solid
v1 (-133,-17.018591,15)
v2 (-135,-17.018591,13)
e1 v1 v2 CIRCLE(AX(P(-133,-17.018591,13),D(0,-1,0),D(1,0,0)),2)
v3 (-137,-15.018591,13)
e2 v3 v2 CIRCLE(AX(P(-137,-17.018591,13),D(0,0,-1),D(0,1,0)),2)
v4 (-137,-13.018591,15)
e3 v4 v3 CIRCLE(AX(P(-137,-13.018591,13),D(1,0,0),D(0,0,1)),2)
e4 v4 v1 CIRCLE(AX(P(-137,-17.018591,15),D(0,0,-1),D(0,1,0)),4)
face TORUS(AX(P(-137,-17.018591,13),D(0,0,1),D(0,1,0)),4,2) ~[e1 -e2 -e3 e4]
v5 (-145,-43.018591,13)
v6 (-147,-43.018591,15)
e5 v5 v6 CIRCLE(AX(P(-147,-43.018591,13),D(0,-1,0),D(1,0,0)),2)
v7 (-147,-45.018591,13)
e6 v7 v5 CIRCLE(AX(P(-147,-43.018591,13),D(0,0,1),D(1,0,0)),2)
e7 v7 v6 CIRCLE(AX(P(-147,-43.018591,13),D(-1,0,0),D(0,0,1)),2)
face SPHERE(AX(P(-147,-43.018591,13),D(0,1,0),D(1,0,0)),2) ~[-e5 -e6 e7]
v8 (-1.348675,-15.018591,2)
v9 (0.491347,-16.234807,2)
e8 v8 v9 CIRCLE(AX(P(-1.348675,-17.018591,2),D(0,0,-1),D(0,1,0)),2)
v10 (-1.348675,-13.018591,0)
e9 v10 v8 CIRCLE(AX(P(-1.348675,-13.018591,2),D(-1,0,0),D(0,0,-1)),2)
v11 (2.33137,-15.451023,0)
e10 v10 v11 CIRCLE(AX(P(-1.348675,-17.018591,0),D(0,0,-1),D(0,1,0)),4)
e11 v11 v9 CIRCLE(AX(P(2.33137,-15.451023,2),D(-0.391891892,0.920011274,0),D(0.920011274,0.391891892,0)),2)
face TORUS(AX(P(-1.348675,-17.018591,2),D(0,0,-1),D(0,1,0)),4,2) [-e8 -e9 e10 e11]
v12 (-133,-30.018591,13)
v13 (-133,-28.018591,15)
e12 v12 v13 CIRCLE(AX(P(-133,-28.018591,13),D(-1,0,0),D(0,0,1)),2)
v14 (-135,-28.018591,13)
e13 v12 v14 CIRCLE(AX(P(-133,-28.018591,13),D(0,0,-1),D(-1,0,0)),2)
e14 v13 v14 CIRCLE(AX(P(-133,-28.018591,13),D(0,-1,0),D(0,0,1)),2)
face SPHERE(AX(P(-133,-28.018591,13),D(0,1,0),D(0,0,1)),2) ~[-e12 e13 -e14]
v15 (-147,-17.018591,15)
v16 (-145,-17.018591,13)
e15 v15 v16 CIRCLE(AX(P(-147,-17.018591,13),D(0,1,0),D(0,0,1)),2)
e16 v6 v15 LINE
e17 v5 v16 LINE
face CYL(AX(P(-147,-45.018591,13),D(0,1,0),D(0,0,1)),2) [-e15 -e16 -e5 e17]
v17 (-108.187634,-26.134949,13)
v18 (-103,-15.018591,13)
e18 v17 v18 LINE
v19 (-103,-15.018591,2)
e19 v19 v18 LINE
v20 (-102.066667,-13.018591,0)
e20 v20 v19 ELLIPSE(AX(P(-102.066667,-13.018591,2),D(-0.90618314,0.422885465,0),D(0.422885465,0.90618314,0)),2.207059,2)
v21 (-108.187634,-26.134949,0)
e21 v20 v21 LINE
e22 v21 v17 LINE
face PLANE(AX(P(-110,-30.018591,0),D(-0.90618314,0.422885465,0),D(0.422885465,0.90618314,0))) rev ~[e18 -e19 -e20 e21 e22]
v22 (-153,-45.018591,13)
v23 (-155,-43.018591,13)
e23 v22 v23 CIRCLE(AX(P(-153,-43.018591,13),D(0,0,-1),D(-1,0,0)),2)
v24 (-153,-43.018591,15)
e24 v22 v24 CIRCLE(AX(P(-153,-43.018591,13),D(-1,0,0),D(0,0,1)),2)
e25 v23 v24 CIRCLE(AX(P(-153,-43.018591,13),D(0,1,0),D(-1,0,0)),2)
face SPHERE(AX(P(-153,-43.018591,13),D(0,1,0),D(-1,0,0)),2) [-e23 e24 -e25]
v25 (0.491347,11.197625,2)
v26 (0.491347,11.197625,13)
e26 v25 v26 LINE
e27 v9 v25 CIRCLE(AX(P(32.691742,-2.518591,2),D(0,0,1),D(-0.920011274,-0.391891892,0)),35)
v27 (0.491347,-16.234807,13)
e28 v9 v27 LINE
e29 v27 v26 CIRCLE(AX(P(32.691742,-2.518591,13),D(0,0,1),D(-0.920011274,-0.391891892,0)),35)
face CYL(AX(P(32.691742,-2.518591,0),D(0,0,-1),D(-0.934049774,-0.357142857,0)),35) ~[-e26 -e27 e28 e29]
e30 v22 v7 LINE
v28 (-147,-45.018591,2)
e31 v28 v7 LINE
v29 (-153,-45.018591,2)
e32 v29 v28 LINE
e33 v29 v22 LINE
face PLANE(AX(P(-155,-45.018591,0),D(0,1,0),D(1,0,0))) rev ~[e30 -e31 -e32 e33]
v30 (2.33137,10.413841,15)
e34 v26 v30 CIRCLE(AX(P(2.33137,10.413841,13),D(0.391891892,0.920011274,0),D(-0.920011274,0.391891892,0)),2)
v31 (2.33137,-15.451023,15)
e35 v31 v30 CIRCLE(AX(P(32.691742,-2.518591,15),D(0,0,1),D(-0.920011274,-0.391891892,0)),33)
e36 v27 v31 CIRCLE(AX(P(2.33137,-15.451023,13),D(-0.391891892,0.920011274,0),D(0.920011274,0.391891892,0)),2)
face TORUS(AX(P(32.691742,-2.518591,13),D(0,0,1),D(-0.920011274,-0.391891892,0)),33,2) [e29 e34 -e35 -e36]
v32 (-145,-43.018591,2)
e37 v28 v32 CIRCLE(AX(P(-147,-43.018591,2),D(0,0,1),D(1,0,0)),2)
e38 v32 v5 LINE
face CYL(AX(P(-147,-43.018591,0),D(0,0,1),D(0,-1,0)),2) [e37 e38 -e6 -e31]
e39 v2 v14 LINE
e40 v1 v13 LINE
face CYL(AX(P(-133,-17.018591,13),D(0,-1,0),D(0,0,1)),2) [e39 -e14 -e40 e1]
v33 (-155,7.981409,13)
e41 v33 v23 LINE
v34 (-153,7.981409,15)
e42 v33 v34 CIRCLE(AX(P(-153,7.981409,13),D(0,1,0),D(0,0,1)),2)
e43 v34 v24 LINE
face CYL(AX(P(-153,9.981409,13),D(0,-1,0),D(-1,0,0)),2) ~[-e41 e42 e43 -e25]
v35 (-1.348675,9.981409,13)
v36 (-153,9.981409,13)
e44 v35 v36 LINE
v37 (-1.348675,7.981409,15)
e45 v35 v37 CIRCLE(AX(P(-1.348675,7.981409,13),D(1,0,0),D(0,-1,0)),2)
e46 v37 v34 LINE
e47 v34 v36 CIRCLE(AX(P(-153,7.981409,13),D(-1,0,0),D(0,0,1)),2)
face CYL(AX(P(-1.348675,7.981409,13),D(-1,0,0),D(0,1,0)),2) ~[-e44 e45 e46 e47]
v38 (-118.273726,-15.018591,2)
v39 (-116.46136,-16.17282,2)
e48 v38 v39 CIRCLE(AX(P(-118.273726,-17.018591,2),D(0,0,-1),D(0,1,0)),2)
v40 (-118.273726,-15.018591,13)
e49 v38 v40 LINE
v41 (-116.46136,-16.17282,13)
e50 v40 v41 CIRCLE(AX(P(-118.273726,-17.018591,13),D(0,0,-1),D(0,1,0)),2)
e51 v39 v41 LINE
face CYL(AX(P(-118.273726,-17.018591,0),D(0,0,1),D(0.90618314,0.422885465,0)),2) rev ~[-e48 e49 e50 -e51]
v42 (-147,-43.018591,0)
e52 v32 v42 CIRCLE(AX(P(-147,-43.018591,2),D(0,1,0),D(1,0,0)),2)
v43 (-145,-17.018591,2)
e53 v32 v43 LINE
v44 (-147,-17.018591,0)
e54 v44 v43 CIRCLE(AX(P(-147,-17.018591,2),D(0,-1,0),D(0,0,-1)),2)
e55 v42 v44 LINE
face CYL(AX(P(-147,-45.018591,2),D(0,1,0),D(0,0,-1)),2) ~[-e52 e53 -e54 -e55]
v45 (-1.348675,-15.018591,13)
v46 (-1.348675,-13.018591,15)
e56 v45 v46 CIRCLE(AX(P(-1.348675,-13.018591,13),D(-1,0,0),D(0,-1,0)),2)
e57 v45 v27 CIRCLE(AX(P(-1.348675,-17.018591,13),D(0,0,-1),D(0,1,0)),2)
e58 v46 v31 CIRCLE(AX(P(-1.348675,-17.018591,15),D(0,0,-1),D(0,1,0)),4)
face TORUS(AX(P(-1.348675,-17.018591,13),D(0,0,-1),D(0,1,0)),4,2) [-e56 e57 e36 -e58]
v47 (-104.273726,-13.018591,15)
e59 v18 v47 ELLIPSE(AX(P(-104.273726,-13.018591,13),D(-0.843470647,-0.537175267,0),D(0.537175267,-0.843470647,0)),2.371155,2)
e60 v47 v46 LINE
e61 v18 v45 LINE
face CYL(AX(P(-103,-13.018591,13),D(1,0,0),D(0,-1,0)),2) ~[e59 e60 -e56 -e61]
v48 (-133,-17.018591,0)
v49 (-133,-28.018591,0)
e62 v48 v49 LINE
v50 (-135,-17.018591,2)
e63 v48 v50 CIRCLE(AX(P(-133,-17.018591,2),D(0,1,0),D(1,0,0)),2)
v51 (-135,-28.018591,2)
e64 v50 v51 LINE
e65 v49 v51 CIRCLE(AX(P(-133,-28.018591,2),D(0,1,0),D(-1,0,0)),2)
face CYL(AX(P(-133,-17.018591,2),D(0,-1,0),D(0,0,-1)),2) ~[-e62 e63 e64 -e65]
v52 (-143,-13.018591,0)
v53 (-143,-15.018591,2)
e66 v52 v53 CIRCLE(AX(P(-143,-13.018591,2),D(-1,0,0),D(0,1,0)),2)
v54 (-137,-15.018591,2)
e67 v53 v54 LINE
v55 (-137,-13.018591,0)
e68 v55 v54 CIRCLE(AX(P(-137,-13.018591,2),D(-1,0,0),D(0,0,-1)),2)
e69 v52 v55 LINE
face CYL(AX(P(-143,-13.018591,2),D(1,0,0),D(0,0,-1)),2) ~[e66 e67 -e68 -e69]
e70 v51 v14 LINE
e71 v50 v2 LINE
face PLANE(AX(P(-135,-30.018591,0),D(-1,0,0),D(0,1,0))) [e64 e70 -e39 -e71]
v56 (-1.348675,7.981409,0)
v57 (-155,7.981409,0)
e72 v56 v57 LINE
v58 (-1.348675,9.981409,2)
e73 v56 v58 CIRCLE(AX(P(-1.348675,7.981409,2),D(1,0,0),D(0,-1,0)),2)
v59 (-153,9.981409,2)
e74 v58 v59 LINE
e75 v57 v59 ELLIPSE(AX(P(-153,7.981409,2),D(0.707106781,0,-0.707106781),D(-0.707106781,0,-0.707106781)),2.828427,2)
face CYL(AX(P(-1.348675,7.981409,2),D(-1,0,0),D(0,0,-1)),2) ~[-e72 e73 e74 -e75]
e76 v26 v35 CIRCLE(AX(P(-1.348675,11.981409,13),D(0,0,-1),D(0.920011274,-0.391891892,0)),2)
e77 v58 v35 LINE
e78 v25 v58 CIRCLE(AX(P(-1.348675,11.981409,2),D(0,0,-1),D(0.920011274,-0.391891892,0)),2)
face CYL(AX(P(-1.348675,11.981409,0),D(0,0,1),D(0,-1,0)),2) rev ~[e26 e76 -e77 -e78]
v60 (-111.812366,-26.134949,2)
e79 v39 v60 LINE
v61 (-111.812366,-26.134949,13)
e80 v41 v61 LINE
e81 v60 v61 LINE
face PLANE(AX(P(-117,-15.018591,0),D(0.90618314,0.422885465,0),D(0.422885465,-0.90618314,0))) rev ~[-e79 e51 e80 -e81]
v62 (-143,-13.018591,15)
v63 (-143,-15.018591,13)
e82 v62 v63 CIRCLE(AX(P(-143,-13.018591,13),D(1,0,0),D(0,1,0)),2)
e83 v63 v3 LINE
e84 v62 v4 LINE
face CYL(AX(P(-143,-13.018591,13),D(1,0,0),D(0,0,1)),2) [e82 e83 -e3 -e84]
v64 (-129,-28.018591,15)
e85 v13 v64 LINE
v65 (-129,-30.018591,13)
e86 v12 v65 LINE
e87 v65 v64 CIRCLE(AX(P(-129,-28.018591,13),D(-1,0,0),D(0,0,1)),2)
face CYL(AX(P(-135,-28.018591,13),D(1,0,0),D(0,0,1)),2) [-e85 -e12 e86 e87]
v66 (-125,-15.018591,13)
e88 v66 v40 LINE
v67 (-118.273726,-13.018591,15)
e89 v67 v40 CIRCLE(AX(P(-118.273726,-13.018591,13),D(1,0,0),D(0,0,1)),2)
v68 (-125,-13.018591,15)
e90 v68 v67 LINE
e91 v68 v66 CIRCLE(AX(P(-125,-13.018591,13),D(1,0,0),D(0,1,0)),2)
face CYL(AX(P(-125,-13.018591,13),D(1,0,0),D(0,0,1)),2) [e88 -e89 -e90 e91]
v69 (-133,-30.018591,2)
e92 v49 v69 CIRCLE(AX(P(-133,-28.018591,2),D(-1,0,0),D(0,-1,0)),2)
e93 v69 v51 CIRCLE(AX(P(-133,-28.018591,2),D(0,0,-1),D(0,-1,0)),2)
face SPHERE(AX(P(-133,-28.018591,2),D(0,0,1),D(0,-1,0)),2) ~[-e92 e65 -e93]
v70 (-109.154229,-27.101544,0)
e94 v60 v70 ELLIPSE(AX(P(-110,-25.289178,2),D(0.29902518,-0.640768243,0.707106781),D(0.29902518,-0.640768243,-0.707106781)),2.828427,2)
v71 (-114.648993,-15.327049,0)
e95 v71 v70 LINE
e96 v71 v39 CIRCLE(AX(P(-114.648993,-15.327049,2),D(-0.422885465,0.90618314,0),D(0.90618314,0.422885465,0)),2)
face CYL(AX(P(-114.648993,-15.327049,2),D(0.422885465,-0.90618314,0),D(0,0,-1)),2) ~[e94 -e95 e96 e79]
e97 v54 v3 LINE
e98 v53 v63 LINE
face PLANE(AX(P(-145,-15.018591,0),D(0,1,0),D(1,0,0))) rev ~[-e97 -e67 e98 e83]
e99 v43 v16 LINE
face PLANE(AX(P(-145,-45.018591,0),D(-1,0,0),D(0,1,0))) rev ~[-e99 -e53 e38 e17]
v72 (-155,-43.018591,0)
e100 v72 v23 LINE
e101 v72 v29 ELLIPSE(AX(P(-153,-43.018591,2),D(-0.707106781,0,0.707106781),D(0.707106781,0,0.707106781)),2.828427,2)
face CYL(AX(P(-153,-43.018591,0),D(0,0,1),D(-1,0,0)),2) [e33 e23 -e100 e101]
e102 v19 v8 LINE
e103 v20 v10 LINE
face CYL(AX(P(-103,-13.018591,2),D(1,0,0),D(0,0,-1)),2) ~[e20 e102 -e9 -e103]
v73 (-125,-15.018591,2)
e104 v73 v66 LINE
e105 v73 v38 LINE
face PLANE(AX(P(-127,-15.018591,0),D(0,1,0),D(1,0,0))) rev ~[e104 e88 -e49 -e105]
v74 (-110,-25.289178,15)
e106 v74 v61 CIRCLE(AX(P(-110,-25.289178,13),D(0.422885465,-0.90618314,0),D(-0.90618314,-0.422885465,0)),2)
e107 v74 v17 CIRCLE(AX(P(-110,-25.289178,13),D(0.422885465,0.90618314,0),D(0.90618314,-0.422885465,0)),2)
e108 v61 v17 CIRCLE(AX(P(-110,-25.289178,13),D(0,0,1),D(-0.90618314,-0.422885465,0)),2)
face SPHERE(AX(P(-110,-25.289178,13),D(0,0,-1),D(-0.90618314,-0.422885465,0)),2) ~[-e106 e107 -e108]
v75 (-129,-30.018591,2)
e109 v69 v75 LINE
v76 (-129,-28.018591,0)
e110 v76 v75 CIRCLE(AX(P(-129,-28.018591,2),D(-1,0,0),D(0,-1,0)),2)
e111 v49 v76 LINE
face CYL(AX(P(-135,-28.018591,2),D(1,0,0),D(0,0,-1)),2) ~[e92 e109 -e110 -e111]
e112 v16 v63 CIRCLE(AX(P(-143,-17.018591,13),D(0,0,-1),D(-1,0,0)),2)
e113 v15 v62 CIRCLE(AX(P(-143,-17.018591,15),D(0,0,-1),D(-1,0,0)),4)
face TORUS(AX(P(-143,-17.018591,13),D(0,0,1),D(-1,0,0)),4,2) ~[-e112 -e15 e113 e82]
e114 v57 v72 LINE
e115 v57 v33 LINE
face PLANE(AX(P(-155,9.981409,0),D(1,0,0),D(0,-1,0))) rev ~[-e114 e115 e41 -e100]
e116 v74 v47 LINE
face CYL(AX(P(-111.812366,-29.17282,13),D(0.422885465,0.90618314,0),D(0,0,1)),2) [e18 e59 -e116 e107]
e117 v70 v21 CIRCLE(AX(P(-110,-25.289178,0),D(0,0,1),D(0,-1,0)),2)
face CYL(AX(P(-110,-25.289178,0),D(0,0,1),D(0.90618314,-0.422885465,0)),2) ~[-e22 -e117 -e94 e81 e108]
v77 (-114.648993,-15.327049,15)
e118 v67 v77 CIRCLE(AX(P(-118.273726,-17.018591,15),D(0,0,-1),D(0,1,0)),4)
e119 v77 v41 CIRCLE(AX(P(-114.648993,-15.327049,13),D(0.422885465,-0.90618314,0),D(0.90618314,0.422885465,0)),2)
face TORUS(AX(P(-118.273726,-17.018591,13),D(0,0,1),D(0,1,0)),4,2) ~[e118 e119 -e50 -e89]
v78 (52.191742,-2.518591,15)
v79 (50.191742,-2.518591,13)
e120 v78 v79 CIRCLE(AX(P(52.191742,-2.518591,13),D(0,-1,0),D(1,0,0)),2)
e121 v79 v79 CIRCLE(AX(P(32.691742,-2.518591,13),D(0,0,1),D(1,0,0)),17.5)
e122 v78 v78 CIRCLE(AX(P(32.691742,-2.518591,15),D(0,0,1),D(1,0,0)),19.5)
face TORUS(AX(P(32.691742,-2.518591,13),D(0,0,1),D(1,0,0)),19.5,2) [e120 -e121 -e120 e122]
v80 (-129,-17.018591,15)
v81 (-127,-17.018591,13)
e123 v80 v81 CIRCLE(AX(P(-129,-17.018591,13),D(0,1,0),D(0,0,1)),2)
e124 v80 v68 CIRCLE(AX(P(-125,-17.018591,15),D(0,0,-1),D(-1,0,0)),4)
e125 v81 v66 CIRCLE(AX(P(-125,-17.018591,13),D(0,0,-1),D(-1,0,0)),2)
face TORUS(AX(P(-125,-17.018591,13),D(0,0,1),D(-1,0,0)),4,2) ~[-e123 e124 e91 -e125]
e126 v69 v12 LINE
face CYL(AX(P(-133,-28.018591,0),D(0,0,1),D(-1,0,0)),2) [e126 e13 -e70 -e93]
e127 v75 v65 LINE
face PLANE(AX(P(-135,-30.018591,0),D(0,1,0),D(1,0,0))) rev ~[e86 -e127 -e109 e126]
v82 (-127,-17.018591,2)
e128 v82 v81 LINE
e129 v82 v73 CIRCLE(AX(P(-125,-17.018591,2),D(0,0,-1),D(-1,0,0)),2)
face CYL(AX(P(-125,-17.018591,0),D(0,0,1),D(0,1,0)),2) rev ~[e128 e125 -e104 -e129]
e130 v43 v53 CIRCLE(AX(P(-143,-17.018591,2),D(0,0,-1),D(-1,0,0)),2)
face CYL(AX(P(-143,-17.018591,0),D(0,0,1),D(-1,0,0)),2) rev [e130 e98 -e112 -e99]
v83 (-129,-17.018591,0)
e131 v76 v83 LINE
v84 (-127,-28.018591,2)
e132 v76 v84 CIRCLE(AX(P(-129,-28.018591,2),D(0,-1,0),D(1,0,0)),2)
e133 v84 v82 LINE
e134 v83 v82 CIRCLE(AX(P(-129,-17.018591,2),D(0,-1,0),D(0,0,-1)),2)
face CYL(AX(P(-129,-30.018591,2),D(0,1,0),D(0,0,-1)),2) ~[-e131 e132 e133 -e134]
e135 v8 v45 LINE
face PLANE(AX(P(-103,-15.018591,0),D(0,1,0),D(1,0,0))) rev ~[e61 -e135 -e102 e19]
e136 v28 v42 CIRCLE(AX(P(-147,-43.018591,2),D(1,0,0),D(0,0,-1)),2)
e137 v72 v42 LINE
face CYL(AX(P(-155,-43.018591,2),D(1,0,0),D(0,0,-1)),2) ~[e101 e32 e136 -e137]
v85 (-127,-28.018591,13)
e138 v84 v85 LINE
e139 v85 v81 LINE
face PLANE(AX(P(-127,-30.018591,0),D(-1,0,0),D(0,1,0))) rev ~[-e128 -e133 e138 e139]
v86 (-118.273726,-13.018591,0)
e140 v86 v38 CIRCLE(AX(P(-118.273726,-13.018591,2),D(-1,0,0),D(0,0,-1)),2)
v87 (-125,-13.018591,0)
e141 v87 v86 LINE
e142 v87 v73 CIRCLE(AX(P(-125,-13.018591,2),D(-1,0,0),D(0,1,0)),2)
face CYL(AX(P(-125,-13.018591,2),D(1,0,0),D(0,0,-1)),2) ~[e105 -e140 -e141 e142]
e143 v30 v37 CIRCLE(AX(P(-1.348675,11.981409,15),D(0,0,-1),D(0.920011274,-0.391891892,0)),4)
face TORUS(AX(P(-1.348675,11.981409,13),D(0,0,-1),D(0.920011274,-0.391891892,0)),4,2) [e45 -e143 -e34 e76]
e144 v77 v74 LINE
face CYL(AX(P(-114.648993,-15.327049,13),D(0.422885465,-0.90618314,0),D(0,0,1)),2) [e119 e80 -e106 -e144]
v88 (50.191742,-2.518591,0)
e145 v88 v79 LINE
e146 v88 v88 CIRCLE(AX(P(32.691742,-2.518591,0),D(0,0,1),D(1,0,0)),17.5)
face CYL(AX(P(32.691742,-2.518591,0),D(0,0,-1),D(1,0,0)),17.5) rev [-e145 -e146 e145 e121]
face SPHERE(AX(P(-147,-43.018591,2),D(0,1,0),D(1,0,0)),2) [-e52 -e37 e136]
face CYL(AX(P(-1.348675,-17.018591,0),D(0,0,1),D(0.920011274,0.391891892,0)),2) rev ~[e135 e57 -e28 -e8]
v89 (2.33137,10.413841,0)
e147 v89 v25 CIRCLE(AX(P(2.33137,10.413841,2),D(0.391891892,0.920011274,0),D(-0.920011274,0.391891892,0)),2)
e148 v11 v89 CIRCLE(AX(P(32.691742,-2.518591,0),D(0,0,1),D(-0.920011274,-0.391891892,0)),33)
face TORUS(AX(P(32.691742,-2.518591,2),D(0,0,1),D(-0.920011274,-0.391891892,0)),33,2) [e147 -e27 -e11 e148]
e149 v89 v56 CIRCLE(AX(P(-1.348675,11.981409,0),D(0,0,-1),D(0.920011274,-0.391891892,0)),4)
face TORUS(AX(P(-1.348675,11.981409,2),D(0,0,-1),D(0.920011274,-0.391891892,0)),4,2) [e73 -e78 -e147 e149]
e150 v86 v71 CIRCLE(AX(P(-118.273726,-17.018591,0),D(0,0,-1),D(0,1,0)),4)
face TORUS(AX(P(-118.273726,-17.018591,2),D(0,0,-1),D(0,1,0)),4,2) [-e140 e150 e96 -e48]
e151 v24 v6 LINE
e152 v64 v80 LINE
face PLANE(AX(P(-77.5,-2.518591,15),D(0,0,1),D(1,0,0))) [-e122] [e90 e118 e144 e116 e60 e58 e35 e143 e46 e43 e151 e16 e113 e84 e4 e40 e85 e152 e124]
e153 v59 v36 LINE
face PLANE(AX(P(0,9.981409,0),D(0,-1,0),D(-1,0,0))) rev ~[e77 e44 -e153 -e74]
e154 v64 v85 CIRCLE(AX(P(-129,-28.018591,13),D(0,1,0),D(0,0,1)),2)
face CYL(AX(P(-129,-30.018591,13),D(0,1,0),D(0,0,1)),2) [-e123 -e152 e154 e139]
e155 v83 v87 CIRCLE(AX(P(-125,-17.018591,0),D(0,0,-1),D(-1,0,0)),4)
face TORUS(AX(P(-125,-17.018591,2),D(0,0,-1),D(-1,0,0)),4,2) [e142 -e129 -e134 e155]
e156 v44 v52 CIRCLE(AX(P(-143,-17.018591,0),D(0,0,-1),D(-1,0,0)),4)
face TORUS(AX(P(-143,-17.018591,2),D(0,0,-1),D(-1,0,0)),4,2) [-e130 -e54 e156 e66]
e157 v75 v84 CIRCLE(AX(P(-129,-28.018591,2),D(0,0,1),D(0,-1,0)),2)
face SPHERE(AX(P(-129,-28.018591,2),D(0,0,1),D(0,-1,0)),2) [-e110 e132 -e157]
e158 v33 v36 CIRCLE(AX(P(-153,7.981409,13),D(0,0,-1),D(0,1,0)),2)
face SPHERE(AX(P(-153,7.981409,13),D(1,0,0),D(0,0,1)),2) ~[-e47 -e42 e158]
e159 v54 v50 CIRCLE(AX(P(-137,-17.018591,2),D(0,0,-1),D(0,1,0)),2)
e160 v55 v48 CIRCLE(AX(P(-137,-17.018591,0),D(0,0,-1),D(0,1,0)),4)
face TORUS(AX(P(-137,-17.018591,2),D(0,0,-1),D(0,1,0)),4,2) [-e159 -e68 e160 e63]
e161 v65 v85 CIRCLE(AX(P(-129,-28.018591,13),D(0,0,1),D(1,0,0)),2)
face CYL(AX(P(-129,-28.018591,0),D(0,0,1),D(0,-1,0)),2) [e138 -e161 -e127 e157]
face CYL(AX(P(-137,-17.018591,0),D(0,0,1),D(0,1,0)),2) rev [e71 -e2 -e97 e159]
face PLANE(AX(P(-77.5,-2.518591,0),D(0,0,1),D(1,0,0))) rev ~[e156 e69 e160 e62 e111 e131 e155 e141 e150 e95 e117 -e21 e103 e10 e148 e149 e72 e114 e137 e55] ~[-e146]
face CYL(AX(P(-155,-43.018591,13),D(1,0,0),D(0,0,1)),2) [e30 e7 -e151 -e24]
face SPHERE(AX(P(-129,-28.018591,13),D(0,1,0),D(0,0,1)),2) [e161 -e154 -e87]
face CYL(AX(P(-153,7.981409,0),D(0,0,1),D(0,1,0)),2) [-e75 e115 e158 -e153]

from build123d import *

# Parameters (mm, degrees)
F0_W     = 10
F0_H     = 30
F0_W_2   = 8
F0_H_2   = 15
F0_R     = 17.5
F1_DEPTH = 15
F2_F1_R  = 2
F2_F2_R  = 2


with BuildPart() as f1:
    # F0 (on Top) → F1 (new body)
    with BuildSketch(Plane.XY):
        Polygon((0, 9.9814090133), (-155, 9.9814090133), (-155, -15.0185909867), (-145, -15.0185909867), (-135, -15.0185909867), (-127, -15.0185909867), (-117, -15.0185909867), (-103, -15.0185909867), (0, -15.0185909867), align=None)
        with Locations((-150, -30.0185909867)):
            Rectangle(F0_W, F0_H)
        with Locations((-131, -22.5185909867)):
            Rectangle(F0_W_2, F0_H_2)
        Polygon((-110, -30.0185909867), (-103, -15.0185909867), (-117, -15.0185909867), align=None)
        with BuildLine():
            ThreePointArc((0, -15.0185909867), (67.6917420766, -2.5185909867), (0, 9.9814090133))
            Line((0, 9.9814090133), (0, -15.0185909867))
        make_face()
        with Locations((32.6917420766, -2.5185909867)):
            Circle(F0_R, mode=Mode.SUBTRACT)
    extrude(amount=F1_DEPTH)

    # F2: fillet of radius 2 on 33 edges, made by hand

    # F2_f1
    f2_f1_edges = [f1.edges().sort_by_distance(p)[0] for p in [
        (-117, -15.0185909867, 7.5),
        (-145, -15.0185909867, 7.5),
        (-135, -15.0185909867, 7.5),
        (-127, -15.0185909867, 7.5),
        (0, -15.0185909867, 7.5),
        (0, 9.9814090133, 7.5),
    ]]
    fillet(f2_f1_edges, radius=F2_F1_R)

    # F2_f2
    f2_f2_edges = [f1.edges().sort_by_distance(p)[0] for p in [
        (-78.1743375386, 9.9814090133, 15),
        (-155, -17.5185909867, 15),
        (-145, -31.0185909867, 15),
        (-140, -15.0185909867, 15),
        (-135, -23.5185909867, 15),
        (-127, -23.5185909867, 15),
        (-131, -30.0185909867, 15),
        (-113.2306798838, -23.0957055214, 15),
        (-52.1743375386, -15.0185909867, 15),
        (-106.5, -22.5185909867, 15),
        (67.6917420766, -2.5185909867, 15),
        (15.1917420766, -2.5185909867, 15),
        (-135, -30.0185909867, 7.5),
        (-127, -30.0185909867, 7.5),
        (-131, -30.0185909867, 0),
        (-140, -15.0185909867, 0),
        (-155, -45.0185909867, 7.5),
        (-145, -45.0185909867, 7.5),
        (-150, -45.0185909867, 0),
        (-150, -45.0185909867, 15),
        (-121.6368630238, -15.0185909867, 0),
        (-121.6368630238, -15.0185909867, 15),
        (-110, -30.0185909867, 7.5),
        (-113.2306798838, -23.0957055214, 0),
        (67.6917420766, -2.5185909867, 0),
        (-155, 9.9814090133, 7.5),
        (-78.1743375386, 9.9814090133, 0),
        (-0.245853144, 10.3129415177, 0),
        (-0.245853144, -15.3501234912, 0),
        (-117.1993755139, -15.3316496924, 0),
        (-126.4142135624, -15.6043774244, 15),
        (-117.1993755139, -15.3316496924, 15),
        (-126.4142135624, -15.6043774244, 0),
        (-144.4142135624, -15.6043774244, 0),
        (-135.5857864376, -15.6043774244, 0),
        (-0.245853144, -15.3501234912, 15),
        (-0.245853144, 10.3129415177, 15),
        (-135.5857864376, -15.6043774244, 15),
        (-144.4142135624, -15.6043774244, 15),
    ]]
    fillet(f2_f2_edges, radius=F2_F2_R)


solid = f1.part
